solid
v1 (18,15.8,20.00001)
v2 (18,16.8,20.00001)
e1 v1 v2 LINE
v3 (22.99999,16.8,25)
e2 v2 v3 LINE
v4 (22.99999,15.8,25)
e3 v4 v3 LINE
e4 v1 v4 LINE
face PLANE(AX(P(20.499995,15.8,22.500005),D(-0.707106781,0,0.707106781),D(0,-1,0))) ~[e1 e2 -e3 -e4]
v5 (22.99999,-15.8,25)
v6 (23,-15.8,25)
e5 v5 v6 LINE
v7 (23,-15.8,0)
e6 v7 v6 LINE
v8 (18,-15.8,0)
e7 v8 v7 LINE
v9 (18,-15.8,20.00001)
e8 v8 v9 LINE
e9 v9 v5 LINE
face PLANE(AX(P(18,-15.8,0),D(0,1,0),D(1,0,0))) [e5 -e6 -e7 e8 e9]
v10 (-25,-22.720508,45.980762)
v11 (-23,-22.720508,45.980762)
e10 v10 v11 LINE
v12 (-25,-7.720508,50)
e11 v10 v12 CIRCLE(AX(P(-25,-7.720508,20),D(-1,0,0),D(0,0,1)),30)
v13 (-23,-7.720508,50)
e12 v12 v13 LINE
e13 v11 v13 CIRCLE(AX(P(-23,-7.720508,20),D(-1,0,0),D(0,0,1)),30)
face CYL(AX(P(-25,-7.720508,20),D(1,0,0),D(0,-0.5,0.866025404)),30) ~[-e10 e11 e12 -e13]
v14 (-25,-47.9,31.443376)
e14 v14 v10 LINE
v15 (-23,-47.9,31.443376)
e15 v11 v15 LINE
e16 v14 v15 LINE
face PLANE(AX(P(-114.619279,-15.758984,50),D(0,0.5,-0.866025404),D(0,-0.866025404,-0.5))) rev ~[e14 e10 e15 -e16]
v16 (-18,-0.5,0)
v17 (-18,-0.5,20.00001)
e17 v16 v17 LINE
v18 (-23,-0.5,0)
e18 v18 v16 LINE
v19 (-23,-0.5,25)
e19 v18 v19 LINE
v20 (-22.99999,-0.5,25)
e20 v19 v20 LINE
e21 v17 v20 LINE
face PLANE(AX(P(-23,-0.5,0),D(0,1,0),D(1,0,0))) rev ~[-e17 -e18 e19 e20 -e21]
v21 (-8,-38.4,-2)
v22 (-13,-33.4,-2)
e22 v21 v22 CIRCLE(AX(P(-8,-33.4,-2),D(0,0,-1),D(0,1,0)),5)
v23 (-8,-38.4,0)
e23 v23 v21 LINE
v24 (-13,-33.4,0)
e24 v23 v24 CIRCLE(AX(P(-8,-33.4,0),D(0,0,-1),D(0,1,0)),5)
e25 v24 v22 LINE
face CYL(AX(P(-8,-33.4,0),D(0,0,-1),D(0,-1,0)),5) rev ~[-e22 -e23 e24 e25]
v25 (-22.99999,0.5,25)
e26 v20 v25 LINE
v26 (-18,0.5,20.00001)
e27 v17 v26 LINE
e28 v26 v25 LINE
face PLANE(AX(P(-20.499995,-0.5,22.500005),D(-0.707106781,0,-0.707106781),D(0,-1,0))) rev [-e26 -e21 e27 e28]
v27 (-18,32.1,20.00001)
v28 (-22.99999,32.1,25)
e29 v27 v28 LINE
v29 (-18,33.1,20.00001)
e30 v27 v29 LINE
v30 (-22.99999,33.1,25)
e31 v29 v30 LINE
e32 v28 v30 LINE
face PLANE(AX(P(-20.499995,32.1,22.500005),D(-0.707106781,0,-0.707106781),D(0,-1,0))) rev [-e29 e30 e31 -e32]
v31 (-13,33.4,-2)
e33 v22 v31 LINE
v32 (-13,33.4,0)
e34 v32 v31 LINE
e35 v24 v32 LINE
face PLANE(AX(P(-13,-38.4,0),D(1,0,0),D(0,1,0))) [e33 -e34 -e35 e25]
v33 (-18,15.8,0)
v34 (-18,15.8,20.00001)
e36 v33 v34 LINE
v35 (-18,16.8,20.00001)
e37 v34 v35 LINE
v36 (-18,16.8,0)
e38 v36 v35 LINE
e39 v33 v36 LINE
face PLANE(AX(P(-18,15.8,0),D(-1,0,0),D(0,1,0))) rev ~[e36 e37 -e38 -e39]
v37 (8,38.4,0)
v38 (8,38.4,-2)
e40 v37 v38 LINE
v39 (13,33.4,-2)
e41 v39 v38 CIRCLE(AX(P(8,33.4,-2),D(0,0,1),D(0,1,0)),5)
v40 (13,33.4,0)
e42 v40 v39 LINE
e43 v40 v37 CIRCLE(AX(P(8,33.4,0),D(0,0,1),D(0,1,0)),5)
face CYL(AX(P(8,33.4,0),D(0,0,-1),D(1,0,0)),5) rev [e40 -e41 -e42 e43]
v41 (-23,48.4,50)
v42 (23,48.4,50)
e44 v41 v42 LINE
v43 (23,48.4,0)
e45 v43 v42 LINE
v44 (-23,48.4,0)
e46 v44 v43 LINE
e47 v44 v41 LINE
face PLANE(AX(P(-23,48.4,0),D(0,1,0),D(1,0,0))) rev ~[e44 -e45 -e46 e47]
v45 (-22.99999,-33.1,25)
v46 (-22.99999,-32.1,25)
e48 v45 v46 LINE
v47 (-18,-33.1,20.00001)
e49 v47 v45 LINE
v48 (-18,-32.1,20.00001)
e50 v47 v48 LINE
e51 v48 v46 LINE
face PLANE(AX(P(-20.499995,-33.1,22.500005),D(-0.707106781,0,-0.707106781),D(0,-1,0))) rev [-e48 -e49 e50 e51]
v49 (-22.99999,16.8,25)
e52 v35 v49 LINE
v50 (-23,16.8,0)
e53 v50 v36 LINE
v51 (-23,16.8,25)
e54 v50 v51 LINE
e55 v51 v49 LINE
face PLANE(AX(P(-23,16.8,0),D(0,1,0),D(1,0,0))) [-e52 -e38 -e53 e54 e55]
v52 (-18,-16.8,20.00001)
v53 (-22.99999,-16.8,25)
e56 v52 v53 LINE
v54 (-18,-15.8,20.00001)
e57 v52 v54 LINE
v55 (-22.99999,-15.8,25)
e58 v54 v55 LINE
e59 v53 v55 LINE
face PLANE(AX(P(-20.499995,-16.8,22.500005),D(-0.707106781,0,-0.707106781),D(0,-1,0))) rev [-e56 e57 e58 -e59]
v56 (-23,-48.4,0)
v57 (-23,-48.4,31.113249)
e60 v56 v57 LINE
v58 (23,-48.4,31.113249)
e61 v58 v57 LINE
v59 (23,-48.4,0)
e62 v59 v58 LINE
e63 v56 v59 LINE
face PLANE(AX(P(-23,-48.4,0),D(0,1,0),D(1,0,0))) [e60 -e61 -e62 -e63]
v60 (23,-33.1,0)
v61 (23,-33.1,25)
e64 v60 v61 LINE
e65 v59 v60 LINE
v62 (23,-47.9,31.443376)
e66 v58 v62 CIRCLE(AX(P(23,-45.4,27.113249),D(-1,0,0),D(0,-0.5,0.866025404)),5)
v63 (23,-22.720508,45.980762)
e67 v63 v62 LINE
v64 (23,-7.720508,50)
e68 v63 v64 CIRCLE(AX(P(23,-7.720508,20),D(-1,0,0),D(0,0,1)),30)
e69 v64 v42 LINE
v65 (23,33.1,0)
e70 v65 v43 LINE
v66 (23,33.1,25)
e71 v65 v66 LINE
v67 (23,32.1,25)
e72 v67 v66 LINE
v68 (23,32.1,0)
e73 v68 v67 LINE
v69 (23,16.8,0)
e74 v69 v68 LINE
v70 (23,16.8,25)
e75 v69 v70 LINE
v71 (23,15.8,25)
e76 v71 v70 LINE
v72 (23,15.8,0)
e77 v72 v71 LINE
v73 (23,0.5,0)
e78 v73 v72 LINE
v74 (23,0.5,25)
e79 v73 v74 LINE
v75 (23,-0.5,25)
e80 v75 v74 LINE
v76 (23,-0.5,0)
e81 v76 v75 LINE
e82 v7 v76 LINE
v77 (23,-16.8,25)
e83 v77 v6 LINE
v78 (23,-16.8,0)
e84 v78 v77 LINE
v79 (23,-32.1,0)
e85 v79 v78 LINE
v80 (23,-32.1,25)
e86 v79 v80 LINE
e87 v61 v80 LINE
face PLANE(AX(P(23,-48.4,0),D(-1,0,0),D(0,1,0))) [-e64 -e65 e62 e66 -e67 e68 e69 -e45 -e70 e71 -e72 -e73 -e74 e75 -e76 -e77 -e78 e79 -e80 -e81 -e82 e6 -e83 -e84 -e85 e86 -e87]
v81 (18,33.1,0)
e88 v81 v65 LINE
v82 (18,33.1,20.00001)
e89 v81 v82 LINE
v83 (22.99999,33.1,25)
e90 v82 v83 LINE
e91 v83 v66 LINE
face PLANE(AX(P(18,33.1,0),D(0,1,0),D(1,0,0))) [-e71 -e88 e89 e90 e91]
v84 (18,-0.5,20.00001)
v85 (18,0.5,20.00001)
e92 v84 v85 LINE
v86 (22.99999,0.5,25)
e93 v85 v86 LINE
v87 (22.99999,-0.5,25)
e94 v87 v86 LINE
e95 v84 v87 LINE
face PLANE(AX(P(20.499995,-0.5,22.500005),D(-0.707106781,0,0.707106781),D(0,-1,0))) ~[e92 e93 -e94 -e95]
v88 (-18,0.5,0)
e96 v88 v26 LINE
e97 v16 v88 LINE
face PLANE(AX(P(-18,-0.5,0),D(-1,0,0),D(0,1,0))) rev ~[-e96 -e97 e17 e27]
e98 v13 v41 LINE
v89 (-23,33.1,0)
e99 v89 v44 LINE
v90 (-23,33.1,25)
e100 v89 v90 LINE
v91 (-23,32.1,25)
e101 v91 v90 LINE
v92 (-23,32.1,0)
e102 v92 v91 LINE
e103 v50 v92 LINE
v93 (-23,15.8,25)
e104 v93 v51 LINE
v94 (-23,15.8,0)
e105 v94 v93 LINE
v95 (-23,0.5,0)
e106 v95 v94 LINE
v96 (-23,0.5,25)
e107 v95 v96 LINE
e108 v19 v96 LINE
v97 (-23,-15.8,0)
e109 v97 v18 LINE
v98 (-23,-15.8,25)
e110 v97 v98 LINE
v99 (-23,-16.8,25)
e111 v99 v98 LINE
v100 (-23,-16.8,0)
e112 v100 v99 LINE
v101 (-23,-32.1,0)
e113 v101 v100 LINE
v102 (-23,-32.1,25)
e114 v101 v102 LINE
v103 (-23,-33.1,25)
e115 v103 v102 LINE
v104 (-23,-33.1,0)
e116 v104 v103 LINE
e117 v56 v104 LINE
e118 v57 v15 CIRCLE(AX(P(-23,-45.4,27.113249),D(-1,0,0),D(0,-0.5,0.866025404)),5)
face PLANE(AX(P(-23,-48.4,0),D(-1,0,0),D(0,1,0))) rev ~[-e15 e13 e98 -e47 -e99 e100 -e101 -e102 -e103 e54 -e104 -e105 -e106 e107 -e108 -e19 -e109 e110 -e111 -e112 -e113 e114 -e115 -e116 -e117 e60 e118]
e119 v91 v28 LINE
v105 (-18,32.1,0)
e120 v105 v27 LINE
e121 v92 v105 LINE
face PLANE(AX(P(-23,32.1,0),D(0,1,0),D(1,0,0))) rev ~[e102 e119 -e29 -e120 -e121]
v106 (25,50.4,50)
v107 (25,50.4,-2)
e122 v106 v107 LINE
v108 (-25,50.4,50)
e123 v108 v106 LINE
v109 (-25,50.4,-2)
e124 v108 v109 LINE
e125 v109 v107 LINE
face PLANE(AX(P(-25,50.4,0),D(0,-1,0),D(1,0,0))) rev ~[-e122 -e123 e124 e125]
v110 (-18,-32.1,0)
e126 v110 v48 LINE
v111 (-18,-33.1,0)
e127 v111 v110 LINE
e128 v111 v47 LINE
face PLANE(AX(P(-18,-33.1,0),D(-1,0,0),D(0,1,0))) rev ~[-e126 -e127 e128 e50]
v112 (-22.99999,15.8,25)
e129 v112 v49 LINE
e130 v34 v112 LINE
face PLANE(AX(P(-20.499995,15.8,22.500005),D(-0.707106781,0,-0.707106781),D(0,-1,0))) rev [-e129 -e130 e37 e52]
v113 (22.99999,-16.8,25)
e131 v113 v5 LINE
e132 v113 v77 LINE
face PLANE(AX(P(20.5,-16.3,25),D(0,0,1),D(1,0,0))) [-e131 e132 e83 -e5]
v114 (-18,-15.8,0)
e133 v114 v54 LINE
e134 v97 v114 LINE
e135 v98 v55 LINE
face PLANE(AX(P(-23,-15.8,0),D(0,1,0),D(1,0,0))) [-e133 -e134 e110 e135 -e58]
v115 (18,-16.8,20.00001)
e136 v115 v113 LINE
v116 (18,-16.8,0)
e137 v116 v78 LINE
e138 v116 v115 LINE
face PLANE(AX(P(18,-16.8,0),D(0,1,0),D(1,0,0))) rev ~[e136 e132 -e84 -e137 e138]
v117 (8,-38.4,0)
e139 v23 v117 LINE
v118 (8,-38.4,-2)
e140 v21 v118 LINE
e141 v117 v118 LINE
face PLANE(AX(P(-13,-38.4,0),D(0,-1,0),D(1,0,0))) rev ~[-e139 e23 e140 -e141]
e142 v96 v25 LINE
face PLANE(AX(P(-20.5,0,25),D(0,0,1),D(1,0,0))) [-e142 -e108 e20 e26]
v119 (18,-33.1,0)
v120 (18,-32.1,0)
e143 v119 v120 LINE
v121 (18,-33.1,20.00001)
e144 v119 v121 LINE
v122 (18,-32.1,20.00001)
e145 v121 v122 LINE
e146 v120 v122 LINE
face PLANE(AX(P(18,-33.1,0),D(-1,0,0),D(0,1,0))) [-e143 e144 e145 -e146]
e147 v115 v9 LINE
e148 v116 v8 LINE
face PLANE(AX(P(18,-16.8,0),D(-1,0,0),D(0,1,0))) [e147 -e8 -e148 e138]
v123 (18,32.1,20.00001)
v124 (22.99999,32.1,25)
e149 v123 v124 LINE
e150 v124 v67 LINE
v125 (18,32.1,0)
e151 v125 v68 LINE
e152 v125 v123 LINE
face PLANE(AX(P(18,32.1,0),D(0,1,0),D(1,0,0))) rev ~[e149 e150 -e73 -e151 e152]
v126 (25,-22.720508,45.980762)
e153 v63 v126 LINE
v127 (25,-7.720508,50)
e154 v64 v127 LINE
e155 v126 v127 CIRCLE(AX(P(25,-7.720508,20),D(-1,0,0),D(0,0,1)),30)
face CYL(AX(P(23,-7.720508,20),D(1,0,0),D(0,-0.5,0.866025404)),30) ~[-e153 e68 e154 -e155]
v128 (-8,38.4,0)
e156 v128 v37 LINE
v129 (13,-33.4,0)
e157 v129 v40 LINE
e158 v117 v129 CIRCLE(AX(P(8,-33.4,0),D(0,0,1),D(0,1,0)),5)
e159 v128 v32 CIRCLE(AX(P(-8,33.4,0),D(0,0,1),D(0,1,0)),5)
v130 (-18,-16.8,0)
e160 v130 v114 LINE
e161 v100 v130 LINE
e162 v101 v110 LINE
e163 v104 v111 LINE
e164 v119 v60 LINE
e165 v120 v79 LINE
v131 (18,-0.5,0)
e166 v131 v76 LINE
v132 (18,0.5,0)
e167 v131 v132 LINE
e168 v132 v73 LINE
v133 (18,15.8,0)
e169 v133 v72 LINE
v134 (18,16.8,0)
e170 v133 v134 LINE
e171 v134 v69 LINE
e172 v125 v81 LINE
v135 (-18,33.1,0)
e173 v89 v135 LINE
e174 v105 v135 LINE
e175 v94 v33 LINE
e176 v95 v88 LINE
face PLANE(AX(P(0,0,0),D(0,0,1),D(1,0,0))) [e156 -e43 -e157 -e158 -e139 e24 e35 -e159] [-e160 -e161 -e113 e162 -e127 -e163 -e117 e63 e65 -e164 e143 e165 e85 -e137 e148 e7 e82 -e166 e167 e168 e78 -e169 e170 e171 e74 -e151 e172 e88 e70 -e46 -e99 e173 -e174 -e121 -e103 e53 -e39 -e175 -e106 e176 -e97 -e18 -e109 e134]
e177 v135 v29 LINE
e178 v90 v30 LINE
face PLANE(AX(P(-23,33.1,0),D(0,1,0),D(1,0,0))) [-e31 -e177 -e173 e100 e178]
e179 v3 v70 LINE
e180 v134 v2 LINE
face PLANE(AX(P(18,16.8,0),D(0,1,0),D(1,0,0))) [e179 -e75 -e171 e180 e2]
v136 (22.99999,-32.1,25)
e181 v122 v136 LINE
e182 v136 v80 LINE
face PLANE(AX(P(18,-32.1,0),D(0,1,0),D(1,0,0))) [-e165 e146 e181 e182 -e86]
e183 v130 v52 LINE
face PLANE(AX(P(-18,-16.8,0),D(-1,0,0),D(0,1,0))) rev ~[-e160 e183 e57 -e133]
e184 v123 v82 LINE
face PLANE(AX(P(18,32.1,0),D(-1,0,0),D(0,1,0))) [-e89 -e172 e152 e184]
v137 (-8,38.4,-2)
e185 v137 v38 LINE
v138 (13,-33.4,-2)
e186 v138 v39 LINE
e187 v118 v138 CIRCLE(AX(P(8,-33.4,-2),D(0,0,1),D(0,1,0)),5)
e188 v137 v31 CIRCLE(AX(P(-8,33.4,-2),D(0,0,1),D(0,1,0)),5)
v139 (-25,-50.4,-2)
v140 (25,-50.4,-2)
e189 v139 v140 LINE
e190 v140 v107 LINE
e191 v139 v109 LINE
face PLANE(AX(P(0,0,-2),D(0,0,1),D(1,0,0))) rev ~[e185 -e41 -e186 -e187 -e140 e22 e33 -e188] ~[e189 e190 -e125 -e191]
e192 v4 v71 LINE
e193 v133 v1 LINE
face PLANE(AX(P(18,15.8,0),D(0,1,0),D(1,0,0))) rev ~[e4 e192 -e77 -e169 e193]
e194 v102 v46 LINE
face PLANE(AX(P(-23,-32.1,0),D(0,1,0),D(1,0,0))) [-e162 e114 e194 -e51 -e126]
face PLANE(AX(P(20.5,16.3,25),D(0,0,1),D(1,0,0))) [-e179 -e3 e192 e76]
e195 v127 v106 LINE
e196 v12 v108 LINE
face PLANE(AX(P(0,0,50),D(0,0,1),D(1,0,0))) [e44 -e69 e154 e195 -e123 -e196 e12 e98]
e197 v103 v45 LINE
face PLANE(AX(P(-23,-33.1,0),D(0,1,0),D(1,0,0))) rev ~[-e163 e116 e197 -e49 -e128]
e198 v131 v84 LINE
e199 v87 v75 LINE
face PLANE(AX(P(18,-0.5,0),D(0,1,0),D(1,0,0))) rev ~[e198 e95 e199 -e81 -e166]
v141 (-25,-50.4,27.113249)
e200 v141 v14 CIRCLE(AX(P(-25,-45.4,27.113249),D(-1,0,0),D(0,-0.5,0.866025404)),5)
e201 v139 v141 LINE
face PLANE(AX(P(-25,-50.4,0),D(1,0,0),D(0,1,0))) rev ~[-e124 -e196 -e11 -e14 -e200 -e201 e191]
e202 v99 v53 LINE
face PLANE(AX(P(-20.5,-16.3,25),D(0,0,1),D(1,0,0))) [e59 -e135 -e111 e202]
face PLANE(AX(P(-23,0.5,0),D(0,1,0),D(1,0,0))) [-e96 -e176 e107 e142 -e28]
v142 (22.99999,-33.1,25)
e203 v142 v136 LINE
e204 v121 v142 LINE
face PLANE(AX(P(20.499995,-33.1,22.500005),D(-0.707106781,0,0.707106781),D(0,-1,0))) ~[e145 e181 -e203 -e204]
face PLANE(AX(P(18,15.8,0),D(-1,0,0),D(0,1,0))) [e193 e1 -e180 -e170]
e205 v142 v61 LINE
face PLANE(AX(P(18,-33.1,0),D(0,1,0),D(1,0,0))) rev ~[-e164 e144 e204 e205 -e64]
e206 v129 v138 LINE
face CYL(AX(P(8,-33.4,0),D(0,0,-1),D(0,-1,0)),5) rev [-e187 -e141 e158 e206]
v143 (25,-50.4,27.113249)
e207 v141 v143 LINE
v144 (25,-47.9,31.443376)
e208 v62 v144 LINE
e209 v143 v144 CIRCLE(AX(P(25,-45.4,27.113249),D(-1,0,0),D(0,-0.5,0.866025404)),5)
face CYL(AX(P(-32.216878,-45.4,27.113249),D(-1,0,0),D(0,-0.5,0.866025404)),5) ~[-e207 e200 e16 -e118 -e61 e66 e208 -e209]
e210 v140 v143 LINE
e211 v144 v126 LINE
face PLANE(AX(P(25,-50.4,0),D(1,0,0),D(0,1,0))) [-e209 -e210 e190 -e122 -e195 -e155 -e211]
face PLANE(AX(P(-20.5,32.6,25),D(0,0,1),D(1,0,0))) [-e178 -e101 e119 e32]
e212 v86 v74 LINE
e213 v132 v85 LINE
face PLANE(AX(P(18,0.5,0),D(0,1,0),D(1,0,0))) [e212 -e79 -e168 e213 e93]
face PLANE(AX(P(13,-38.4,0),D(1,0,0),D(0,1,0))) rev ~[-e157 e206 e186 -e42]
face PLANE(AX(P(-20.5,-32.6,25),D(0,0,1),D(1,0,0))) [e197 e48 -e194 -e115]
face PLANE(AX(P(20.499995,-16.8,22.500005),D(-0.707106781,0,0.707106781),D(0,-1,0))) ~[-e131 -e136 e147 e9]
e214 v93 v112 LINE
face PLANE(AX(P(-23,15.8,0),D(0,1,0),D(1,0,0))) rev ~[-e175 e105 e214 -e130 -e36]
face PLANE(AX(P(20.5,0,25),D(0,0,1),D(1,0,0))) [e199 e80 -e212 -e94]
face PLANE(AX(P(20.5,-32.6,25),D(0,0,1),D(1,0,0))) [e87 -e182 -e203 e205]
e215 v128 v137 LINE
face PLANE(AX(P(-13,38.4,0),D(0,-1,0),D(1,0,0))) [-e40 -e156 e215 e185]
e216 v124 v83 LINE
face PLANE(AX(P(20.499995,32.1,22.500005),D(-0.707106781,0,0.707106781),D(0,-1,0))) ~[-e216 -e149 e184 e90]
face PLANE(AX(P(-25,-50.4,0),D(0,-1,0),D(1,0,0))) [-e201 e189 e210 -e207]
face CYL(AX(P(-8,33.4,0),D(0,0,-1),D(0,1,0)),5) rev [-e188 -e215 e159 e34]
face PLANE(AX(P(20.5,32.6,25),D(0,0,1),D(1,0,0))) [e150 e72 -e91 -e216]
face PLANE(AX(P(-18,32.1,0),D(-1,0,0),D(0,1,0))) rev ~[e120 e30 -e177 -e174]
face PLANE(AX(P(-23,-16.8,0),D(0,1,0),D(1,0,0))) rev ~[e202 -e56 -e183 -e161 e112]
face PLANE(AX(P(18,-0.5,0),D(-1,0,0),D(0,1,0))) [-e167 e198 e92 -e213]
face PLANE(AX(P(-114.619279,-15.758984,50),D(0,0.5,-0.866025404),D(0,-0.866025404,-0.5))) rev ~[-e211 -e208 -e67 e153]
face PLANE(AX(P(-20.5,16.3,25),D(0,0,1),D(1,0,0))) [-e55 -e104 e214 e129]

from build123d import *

# Parameters (mm, degrees)
F0_W        = 50
F0_H        = 100.8
F0_W_2      = 46
F0_H_2      = 96.8
F1_DEPTH    = 50
F2_W        = 50
F2_H        = 100.8
F2_W_2      = 26
F2_H_2      = 76.8
F3_DEPTH    = 2
F4_T1_DEPTH = 229.2385588234
F5_R        = 30
F6_T1_DEPTH = 64.4337567297
F7_R        = 5
F8_W        = 5
F8_H        = 1
F9_DEPTH    = 25
F10_SIZE    = 4.99999


# Not quite as in the source:
# - a fillet or chamfer that OpenCascade refuses, or shapes differently, is made with other operations: its cross-section is extruded or revolved along the edge and cut away or added
# - a fillet or chamfer is up to 0.001 mm smaller than in the source, because OpenCascade refuses the exact size


with BuildPart() as f1:
    # F0 (on Top) → F1 (new body)
    with BuildSketch(Plane.XY):
        Rectangle(F0_W, F0_H)
        Rectangle(F0_W_2, F0_H_2, mode=Mode.SUBTRACT)
    extrude(amount=F1_DEPTH)

    # F2 (on Top) → F3 (join)
    with BuildSketch(Plane.XY):
        Rectangle(F2_W, F2_H)
        Rectangle(F2_W_2, F2_H_2, mode=Mode.SUBTRACT)
    extrude(amount=-F3_DEPTH)

    # F4: chamfer of 20 x 34.6410161514 on 1 edges, made by hand

    # F4_s2 → F4_t1 (cut)
    with BuildSketch(Plane.YZ.offset(-114.6192794117)):
        Polygon((-15.7589838486, 50), (-50.4, 30), (-50.4, 50), align=None)
    extrude(amount=F4_T1_DEPTH, mode=Mode.SUBTRACT)

    # F5
    f5_edges = [f1.edges().sort_by_distance(p)[0] for p in [
        (24, -15.758984, 50),
        (-24, -15.758984, 50),
    ]]
    fillet(f5_edges, radius=F5_R)

    # F6: fillet of radius 5 on 1 edges, made by hand

    # F6_s2 → F6_t1 (cut)
    with BuildSketch(Plane.YZ.offset(-32.2168783649)):
        with BuildLine():
            ThreePointArc((-47.9, 31.443375673), (-49.7301270189, 29.6132486541), (-50.4, 27.1132486541))
            Line((-50.4, 27.1132486541), (-50.4, 30))
            Line((-50.4, 30), (-47.9, 31.443375673))
        make_face()
    extrude(amount=F6_T1_DEPTH, mode=Mode.SUBTRACT)

    # F7
    f7_edges = [f1.edges().sort_by_distance(p)[0] for p in [
        (13, 38.4, -1),
        (-13, 38.4, -1),
        (13, -38.4, -1),
        (-13, -38.4, -1),
    ]]
    fillet(f7_edges, radius=F7_R)

    # F8 (on face) → F9 (join)
    with BuildSketch(Plane.XY):
        with Locations((-20.5, 32.6)):
            Rectangle(F8_W, F8_H)
        with Locations((-20.5, 16.3)):
            Rectangle(F8_W, F8_H)
        with Locations((-20.5, 0)):
            Rectangle(F8_W, F8_H)
        with Locations((-20.5, -16.3)):
            Rectangle(F8_W, F8_H)
        with Locations((-20.5, -32.6)):
            Rectangle(F8_W, F8_H)
        with Locations((20.5, -32.6)):
            Rectangle(F8_W, F8_H)
        with Locations((20.5, -16.3)):
            Rectangle(F8_W, F8_H)
        with Locations((20.5, 16.3)):
            Rectangle(F8_W, F8_H)
        with Locations((20.5, 0)):
            Rectangle(F8_W, F8_H)
        with Locations((20.5, 32.6)):
            Rectangle(F8_W, F8_H)
    extrude(amount=F9_DEPTH)

    # F10 (size 5 in the source; OpenCascade refuses exactly that, so slightly less here)
    f10_edges = [f1.edges().sort_by_distance(p)[0] for p in [
        (-18, 32.6, 25),
        (-18, 16.3, 25),
        (-18, 0, 25),
        (-18, -16.3, 25),
        (-18, -32.6, 25),
        (18, -32.6, 25),
        (18, -16.3, 25),
        (18, 0, 25),
        (18, 16.3, 25),
        (18, 32.6, 25),
    ]]
    chamfer(f10_edges, length=F10_SIZE)


solid = f1.part
